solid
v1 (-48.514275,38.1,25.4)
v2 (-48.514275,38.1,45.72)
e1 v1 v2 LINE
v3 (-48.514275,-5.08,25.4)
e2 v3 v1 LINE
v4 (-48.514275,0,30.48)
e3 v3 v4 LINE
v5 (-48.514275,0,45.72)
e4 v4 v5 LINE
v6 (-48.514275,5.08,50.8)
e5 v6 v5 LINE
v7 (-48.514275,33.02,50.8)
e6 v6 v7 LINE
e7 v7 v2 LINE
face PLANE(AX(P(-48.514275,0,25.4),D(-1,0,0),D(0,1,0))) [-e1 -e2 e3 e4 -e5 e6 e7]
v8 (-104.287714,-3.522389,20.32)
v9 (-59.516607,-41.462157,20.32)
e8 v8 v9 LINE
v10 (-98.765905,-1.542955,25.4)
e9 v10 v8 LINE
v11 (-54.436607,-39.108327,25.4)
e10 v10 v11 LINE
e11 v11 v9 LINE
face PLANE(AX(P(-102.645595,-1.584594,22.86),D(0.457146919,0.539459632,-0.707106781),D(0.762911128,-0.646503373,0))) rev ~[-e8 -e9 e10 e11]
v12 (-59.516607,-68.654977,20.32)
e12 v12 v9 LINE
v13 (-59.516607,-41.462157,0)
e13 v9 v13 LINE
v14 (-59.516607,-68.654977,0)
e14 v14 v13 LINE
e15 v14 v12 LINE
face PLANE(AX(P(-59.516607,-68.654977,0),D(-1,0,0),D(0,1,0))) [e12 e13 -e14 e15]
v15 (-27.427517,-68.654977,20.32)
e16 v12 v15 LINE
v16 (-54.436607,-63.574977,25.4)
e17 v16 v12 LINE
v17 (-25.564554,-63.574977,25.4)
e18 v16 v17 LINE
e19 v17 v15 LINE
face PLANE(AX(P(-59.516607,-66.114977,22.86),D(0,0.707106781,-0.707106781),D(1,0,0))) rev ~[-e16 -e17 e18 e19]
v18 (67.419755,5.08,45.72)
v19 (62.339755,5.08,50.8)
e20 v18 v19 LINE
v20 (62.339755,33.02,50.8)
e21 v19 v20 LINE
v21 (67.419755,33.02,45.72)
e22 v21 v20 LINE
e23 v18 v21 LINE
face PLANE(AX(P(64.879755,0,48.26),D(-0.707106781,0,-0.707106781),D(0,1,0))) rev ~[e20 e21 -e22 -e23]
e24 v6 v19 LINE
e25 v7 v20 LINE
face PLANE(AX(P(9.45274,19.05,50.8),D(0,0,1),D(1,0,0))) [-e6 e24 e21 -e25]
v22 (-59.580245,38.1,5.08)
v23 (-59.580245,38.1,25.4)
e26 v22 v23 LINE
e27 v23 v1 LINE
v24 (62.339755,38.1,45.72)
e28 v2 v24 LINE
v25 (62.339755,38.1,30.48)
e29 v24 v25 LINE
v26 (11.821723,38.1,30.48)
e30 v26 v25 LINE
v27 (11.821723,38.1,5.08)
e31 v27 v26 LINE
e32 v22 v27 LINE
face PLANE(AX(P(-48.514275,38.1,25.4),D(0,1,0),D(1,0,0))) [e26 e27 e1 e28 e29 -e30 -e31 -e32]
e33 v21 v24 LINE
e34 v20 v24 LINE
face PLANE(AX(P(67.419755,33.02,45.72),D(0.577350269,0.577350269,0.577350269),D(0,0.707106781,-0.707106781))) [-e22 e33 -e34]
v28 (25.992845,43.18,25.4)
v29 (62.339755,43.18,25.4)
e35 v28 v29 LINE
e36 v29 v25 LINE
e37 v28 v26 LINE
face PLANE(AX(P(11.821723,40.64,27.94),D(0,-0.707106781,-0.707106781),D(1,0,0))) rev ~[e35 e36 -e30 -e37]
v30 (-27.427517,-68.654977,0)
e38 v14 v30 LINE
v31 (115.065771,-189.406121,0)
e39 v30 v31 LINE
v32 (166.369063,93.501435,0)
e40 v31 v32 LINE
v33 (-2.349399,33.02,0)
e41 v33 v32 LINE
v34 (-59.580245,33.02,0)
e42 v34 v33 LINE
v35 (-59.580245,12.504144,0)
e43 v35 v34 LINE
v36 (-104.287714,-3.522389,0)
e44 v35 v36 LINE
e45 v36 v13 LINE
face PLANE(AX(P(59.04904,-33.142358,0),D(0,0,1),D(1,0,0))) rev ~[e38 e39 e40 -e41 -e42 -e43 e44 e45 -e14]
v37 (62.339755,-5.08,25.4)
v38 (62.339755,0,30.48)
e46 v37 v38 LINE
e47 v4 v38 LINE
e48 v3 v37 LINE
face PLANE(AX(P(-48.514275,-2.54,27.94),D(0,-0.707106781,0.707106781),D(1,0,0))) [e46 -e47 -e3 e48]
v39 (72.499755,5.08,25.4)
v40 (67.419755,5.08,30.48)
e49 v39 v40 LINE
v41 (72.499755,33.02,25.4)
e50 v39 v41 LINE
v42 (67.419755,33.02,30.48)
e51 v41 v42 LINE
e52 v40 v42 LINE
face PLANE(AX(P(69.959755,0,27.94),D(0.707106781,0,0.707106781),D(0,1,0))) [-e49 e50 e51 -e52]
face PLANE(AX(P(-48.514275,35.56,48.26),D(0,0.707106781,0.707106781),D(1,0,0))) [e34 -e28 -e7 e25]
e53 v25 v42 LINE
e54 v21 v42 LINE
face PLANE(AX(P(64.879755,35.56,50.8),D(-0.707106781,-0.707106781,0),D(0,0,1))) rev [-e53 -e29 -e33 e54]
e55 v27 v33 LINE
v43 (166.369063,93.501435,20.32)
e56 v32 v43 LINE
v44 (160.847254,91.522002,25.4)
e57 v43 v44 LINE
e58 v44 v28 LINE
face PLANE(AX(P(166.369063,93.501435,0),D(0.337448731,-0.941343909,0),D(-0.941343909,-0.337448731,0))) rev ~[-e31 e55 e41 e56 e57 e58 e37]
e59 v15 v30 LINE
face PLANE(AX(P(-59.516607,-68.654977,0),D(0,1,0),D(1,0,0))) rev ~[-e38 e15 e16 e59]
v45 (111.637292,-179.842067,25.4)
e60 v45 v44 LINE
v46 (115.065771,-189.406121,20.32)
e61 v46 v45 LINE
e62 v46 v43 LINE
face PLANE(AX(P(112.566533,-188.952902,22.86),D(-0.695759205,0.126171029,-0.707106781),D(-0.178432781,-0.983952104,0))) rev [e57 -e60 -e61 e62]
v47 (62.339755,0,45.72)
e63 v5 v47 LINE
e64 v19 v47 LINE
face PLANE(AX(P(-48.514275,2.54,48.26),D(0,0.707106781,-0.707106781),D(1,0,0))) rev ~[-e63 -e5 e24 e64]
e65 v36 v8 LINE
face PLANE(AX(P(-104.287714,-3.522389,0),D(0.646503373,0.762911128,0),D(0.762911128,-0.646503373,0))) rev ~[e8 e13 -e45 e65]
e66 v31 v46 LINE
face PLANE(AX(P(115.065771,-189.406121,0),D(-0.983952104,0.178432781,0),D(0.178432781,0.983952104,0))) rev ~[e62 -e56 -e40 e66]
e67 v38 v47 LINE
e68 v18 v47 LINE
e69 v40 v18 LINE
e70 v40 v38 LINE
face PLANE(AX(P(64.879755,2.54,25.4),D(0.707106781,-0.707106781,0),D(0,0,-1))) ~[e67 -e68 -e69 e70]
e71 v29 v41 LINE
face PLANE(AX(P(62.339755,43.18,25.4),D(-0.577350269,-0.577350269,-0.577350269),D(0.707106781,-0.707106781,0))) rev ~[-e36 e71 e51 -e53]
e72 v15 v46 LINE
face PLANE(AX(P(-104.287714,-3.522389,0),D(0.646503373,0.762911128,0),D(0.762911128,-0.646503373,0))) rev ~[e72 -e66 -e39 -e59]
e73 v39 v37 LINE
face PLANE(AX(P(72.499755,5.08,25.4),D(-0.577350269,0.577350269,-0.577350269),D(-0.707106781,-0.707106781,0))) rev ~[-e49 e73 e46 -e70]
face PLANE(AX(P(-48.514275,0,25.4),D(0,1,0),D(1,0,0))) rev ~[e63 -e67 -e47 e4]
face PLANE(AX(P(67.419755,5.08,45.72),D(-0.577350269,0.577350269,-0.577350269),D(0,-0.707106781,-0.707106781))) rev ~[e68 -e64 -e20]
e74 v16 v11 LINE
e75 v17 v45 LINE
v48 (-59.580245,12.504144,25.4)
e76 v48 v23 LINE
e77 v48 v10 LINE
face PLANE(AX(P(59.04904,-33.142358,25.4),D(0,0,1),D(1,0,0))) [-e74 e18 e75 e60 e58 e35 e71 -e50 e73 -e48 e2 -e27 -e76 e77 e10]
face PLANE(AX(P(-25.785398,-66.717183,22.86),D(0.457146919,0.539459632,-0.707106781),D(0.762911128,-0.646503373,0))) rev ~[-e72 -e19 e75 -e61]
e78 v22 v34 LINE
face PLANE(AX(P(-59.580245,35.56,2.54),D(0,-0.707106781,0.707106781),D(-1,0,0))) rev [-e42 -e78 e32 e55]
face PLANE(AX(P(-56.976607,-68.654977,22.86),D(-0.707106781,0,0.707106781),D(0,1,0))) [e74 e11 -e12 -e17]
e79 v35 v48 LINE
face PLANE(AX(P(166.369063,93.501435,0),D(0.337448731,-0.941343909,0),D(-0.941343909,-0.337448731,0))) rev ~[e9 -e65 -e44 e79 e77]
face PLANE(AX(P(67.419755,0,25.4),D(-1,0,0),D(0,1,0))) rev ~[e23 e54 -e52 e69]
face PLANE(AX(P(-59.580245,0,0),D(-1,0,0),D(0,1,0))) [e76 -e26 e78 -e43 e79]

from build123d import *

# Parameters (mm, degrees)
F0_W     = 127
F0_H     = 38.1
F1_DEPTH = 25.4
F2_W     = 115.9340298213
F2_H     = 38.1
F3_DEPTH = 25.4
F4_W     = 127
F4_H     = 68.654977391
F5_DEPTH = 25.4
F7_DEPTH = 25.4
F8_SIZE  = 5.08


# Not quite as in the source:
# - the program builds the solid bodies; features that only make, move or delete a surface that nothing else refers to are left out


with BuildPart() as f1:
    # F0 (on Top) → F1 (new body)
    with BuildSketch(Plane.XY):
        with Locations((3.9197548818, 19.05)):
            Rectangle(F0_W, F0_H)
    extrude(amount=F1_DEPTH)

    # F2 (on face) → F3 (join)
    with BuildSketch(Plane.XY.offset(25.4)):
        with Locations((9.4527399712, 19.05)):
            Rectangle(F2_W, F2_H)
    extrude(amount=F3_DEPTH)

    # F4 (on Top) → F5 (join)
    with BuildSketch(Plane.XY):
        with Locations((3.9833925518, -34.3274886955)):
            Rectangle(F4_W, F4_H)
    extrude(amount=F5_DEPTH)

    # F6 (on Top) → F7 (join)
    with BuildSketch(Plane.XY):
        Polygon((115.0657710181, -189.4061209801), (166.3690629853, 93.5014354232), (-104.2877137661, -3.5223886371), align=None)
    extrude(amount=F7_DEPTH)

    # F8
    f8_edges = [f1.edges().sort_by_distance(p)[0] for p in [
        (140.717417, -47.952343, 25.4),
        (43.819127, -129.030549, 25.4),
        (-43.472062, -68.654977, 25.4),
        (-59.516607, -55.058567, 25.4),
        (-81.902161, -22.492273, 25.4),
        (9.45274, 0, 50.8),
        (-23.879261, 38.1, 0),
        (9.45274, 38.1, 50.8),
        (67.419755, 19.05, 50.8),
        (67.419755, 0, 38.1),
        (67.419755, 19.05, 25.4),
        (67.419755, 38.1, 38.1),
        (39.620739, 38.1, 25.4),
        (9.45274, 0, 25.4),
    ]]
    chamfer(f8_edges, length=F8_SIZE)


solid = f1.part
